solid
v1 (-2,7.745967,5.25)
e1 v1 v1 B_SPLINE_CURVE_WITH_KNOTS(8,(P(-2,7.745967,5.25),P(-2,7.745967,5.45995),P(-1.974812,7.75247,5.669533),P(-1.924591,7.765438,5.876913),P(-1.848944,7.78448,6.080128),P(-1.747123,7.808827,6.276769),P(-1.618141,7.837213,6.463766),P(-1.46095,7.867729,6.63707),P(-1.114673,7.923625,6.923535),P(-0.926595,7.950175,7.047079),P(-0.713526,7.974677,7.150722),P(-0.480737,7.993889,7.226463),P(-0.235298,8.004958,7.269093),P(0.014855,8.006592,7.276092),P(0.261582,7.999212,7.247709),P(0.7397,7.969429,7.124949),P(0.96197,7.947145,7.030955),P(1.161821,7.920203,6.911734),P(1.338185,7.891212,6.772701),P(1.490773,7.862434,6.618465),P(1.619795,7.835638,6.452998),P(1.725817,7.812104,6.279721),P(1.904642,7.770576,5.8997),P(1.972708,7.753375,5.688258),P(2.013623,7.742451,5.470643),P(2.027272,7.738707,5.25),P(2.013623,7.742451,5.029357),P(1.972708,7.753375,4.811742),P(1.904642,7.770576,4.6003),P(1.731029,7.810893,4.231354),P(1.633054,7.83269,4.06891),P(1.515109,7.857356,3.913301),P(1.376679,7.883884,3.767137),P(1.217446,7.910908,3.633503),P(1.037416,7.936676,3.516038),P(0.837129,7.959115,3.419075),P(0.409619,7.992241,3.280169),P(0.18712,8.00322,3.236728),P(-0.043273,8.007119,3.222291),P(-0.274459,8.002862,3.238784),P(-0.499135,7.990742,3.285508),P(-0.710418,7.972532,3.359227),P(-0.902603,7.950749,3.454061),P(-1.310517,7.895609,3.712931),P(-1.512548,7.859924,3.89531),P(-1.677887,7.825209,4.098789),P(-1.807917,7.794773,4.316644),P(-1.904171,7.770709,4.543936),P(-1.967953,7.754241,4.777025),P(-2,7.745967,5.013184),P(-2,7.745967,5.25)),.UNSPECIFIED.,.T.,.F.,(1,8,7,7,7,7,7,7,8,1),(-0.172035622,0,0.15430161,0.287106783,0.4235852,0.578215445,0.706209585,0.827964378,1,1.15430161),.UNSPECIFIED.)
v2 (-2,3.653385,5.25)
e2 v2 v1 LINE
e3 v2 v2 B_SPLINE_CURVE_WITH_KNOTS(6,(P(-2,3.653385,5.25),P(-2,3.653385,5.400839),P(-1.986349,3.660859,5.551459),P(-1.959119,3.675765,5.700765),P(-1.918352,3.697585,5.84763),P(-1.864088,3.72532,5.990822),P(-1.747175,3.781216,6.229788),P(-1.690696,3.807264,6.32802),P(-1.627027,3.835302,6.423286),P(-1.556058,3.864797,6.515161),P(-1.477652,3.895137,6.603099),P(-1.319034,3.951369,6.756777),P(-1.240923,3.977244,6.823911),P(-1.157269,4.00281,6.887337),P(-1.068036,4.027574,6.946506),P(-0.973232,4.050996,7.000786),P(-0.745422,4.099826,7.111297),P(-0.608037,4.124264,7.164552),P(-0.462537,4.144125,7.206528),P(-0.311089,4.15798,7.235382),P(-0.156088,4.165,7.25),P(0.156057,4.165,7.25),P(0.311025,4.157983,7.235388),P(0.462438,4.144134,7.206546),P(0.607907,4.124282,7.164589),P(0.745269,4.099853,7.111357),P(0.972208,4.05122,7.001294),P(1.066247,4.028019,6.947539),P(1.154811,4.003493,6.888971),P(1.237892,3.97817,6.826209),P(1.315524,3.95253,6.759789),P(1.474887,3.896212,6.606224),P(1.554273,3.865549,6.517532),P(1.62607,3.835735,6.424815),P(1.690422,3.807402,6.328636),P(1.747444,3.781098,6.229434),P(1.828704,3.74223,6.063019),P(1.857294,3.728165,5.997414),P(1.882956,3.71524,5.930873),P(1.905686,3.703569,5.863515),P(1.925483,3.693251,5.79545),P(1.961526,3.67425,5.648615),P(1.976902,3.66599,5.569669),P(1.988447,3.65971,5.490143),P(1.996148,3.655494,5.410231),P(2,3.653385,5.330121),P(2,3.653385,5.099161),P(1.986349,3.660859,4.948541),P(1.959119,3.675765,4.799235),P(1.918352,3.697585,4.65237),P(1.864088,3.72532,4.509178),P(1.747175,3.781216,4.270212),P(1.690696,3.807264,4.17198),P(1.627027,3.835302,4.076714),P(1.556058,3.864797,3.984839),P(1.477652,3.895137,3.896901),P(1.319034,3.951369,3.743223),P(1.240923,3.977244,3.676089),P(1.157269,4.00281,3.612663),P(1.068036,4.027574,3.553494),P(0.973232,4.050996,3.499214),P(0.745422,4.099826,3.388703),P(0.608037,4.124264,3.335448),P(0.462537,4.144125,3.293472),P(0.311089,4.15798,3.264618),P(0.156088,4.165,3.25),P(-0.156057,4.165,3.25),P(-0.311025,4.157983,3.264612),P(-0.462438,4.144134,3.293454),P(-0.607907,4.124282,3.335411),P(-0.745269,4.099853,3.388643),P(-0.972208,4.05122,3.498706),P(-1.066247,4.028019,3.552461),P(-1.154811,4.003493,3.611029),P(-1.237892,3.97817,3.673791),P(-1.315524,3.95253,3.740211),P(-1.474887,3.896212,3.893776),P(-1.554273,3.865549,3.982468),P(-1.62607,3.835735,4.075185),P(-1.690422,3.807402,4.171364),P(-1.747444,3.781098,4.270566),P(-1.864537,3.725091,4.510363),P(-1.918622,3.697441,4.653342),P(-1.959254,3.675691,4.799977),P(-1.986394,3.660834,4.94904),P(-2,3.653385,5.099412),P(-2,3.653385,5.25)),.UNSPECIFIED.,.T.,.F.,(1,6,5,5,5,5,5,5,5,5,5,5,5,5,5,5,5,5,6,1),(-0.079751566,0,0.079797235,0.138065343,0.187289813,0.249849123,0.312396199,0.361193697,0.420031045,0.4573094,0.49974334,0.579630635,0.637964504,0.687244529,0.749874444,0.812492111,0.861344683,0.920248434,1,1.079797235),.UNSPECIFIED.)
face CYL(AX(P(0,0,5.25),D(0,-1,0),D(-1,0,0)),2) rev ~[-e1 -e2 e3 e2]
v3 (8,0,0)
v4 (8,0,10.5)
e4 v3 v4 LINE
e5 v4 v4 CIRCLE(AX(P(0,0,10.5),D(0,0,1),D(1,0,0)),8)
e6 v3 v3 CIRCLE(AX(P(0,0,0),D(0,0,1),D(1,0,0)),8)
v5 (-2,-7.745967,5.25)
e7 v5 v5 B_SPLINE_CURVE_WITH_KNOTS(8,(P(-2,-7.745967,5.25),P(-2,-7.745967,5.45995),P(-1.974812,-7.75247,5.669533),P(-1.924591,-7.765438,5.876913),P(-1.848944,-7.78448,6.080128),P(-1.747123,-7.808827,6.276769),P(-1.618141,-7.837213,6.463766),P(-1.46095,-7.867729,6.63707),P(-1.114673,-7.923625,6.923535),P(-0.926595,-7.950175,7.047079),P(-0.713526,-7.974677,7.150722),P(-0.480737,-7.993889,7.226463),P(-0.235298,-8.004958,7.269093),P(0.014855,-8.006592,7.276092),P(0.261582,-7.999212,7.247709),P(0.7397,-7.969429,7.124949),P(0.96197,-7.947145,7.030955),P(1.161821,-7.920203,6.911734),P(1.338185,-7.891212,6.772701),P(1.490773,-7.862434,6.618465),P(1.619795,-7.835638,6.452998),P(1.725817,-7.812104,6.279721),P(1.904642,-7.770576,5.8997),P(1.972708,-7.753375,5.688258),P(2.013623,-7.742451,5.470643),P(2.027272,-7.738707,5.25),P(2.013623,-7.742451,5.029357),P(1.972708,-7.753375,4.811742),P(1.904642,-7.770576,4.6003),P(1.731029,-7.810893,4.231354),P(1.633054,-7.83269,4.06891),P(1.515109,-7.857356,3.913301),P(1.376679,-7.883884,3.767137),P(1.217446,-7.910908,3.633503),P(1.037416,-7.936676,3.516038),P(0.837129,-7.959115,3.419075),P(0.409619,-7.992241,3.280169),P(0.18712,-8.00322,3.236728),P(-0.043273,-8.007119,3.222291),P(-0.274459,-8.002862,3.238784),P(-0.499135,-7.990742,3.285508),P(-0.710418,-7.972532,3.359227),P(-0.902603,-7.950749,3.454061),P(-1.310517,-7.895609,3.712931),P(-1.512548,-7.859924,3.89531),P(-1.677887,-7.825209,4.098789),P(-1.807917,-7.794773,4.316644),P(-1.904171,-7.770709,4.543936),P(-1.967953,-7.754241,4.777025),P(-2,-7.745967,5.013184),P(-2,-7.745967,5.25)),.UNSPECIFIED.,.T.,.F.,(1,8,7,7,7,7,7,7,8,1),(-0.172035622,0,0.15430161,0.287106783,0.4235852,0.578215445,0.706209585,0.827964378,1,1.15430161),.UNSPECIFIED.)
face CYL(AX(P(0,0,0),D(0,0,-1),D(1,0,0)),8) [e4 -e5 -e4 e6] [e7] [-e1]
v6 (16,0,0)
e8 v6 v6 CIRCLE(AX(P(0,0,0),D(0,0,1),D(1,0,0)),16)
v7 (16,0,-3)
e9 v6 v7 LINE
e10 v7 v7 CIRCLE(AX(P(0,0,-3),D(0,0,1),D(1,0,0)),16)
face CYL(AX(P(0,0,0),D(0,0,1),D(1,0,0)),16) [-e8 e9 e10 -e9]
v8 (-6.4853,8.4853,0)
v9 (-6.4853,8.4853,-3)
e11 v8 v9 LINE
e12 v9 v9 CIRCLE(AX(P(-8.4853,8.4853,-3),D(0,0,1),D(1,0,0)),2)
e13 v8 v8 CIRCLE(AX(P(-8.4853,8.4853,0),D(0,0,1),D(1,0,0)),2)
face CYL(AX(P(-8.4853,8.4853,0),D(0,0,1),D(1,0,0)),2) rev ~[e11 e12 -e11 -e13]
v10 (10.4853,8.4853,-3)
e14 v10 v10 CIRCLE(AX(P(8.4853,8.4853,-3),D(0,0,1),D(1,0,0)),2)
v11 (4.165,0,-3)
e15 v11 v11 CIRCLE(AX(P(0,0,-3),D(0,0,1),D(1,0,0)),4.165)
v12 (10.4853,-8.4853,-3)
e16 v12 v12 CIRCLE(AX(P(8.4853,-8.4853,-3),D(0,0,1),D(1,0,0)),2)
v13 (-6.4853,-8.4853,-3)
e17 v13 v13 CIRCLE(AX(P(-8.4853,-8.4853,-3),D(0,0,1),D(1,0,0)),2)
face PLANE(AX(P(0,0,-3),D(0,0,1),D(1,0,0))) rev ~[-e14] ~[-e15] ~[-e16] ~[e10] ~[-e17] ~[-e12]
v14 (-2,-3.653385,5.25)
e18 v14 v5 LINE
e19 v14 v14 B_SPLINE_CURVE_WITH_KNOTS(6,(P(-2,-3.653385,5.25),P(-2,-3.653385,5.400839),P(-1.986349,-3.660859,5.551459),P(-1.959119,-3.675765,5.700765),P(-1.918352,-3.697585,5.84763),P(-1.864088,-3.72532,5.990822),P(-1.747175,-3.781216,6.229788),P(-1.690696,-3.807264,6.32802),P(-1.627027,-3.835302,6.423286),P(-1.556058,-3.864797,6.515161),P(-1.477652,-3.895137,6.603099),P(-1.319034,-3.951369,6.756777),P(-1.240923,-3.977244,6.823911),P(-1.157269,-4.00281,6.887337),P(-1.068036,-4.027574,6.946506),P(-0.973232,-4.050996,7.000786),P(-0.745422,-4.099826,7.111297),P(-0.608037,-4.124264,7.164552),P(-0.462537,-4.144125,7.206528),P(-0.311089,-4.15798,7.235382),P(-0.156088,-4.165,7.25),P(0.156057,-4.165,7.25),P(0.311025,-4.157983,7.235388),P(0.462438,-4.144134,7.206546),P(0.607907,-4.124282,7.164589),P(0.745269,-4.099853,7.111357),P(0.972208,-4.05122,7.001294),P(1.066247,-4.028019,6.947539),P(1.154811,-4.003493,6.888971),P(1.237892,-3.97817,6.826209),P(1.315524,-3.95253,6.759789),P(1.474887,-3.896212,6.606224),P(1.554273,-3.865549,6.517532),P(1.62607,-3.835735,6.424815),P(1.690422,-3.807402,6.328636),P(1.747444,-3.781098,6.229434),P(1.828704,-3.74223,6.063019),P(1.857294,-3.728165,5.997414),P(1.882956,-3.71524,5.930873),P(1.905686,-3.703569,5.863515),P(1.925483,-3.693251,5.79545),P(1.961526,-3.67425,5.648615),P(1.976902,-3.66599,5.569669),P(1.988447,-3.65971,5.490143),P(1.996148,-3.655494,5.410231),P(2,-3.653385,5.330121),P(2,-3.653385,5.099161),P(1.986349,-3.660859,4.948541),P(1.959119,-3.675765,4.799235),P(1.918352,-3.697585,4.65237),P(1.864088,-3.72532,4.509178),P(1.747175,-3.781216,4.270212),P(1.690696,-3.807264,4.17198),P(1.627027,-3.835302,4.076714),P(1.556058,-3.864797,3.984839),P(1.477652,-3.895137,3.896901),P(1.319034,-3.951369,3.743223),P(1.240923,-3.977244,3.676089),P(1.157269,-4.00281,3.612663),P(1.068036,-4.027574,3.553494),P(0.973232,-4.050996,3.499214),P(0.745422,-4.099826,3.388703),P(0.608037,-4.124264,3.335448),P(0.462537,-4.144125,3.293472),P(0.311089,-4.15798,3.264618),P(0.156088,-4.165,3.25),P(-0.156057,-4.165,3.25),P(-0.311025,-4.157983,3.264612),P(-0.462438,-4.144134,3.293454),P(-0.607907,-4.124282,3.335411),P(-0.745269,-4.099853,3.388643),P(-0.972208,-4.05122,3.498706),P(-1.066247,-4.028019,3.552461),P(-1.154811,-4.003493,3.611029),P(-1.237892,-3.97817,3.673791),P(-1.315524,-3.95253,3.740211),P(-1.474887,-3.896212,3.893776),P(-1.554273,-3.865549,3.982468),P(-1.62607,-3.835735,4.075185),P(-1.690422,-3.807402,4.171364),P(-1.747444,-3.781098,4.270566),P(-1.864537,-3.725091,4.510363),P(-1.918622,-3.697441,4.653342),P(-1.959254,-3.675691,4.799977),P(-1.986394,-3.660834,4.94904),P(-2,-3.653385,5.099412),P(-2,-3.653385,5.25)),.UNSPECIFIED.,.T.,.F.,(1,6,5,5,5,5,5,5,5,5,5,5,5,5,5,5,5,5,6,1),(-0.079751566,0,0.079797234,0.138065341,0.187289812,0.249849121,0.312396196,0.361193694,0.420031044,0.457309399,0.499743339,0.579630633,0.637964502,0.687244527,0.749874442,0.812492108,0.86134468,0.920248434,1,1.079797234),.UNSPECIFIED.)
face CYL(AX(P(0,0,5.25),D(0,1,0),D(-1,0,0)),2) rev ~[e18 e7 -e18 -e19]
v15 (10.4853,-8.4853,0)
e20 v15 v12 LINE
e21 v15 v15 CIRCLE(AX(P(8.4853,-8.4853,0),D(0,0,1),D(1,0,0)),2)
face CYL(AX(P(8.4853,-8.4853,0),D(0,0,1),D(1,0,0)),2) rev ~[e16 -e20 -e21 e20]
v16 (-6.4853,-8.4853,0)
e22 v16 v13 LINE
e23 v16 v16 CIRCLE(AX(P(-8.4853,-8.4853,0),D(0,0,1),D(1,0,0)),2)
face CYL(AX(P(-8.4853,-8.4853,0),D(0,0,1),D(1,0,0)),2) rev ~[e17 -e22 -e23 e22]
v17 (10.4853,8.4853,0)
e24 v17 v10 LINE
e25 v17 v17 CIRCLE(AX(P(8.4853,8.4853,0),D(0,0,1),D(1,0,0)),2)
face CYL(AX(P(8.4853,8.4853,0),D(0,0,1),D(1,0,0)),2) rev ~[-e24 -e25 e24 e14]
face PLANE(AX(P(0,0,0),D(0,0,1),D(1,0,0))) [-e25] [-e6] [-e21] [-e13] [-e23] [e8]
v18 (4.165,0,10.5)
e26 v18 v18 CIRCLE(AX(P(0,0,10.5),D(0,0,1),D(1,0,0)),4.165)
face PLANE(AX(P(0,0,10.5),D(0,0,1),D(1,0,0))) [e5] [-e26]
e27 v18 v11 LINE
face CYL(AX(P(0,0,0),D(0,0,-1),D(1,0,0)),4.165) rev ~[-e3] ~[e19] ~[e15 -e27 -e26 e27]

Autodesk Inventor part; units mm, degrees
ref_plane "YZ Plane" through (0, 0, 0) normal (1, 0, 0) x (0, 1, 0)
ref_plane "XZ Plane" through (0, 0, 0) normal (0, 1, 0) x (-1, 0, 0)
ref_plane "XY Plane" through (0, 0, 0) normal (0, 0, 1) x (1, 0, 0)
sketch "Base" plane through (0, 0, 0) normal (0, 0, 1) x (1, 0, 0)
  circle A0 centre (0, 0) radius 4.165
  circle A1 centre (0, 0) radius 8
  circle A2 centre (0, 0) radius 16
  line L0 (-8.4853, 8.4853) -> (8.4853, 8.4853) construction
  line L1 (8.4853, 8.4853) -> (8.4853, -8.4853) construction
  line L2 (8.4853, -8.4853) -> (-8.4853, -8.4853) construction
  line L3 (-8.4853, -8.4853) -> (-8.4853, 8.4853) construction
  circle A3 centre (0, 0) radius 13.4763 construction
  circle A4 centre (0, 0) radius 14 construction
  circle A5 centre (8.4853, 8.4853) radius 2
  circle A6 centre (8.4853, -8.4853) radius 2
  circle A7 centre (-8.4853, -8.4853) radius 2
  circle A8 centre (-8.4853, 8.4853) radius 2
  dimension "d0" = 8.33
  dimension "d1" = 16
  dimension "d2" = 32
  dimension "d3" = 2.5237
  dimension "d4" = 2
  dimension "d5" = 4
extrude "BaseFeature" add sketch "Base" against normal blind 3 contours A1 | A2
extrude "MountFeature" add sketch "Base" along normal blind 10.5 contours A1
sketch "SetScrewHole" plane through (0, 0, 0) normal (0, 1, 0) x (-1, 0, 0)
  circle A0 centre (0, 5.25) radius 2
  line L0 (8, 10.5) -> (-8, 10.5) construction
  line L1 (-8, 0) -> (8, 0) construction
  line L2 (-4.165, 10.5) -> (4.165, 10.5) projected
  line L3 (0, 10.5) -> (0, 0) construction
  dimension "d10" = 4
extrude "SetScrewHoleFeature" cut sketch "SetScrewHole" along normal through all both and the other way through all
properties part number "Hub8mm"
